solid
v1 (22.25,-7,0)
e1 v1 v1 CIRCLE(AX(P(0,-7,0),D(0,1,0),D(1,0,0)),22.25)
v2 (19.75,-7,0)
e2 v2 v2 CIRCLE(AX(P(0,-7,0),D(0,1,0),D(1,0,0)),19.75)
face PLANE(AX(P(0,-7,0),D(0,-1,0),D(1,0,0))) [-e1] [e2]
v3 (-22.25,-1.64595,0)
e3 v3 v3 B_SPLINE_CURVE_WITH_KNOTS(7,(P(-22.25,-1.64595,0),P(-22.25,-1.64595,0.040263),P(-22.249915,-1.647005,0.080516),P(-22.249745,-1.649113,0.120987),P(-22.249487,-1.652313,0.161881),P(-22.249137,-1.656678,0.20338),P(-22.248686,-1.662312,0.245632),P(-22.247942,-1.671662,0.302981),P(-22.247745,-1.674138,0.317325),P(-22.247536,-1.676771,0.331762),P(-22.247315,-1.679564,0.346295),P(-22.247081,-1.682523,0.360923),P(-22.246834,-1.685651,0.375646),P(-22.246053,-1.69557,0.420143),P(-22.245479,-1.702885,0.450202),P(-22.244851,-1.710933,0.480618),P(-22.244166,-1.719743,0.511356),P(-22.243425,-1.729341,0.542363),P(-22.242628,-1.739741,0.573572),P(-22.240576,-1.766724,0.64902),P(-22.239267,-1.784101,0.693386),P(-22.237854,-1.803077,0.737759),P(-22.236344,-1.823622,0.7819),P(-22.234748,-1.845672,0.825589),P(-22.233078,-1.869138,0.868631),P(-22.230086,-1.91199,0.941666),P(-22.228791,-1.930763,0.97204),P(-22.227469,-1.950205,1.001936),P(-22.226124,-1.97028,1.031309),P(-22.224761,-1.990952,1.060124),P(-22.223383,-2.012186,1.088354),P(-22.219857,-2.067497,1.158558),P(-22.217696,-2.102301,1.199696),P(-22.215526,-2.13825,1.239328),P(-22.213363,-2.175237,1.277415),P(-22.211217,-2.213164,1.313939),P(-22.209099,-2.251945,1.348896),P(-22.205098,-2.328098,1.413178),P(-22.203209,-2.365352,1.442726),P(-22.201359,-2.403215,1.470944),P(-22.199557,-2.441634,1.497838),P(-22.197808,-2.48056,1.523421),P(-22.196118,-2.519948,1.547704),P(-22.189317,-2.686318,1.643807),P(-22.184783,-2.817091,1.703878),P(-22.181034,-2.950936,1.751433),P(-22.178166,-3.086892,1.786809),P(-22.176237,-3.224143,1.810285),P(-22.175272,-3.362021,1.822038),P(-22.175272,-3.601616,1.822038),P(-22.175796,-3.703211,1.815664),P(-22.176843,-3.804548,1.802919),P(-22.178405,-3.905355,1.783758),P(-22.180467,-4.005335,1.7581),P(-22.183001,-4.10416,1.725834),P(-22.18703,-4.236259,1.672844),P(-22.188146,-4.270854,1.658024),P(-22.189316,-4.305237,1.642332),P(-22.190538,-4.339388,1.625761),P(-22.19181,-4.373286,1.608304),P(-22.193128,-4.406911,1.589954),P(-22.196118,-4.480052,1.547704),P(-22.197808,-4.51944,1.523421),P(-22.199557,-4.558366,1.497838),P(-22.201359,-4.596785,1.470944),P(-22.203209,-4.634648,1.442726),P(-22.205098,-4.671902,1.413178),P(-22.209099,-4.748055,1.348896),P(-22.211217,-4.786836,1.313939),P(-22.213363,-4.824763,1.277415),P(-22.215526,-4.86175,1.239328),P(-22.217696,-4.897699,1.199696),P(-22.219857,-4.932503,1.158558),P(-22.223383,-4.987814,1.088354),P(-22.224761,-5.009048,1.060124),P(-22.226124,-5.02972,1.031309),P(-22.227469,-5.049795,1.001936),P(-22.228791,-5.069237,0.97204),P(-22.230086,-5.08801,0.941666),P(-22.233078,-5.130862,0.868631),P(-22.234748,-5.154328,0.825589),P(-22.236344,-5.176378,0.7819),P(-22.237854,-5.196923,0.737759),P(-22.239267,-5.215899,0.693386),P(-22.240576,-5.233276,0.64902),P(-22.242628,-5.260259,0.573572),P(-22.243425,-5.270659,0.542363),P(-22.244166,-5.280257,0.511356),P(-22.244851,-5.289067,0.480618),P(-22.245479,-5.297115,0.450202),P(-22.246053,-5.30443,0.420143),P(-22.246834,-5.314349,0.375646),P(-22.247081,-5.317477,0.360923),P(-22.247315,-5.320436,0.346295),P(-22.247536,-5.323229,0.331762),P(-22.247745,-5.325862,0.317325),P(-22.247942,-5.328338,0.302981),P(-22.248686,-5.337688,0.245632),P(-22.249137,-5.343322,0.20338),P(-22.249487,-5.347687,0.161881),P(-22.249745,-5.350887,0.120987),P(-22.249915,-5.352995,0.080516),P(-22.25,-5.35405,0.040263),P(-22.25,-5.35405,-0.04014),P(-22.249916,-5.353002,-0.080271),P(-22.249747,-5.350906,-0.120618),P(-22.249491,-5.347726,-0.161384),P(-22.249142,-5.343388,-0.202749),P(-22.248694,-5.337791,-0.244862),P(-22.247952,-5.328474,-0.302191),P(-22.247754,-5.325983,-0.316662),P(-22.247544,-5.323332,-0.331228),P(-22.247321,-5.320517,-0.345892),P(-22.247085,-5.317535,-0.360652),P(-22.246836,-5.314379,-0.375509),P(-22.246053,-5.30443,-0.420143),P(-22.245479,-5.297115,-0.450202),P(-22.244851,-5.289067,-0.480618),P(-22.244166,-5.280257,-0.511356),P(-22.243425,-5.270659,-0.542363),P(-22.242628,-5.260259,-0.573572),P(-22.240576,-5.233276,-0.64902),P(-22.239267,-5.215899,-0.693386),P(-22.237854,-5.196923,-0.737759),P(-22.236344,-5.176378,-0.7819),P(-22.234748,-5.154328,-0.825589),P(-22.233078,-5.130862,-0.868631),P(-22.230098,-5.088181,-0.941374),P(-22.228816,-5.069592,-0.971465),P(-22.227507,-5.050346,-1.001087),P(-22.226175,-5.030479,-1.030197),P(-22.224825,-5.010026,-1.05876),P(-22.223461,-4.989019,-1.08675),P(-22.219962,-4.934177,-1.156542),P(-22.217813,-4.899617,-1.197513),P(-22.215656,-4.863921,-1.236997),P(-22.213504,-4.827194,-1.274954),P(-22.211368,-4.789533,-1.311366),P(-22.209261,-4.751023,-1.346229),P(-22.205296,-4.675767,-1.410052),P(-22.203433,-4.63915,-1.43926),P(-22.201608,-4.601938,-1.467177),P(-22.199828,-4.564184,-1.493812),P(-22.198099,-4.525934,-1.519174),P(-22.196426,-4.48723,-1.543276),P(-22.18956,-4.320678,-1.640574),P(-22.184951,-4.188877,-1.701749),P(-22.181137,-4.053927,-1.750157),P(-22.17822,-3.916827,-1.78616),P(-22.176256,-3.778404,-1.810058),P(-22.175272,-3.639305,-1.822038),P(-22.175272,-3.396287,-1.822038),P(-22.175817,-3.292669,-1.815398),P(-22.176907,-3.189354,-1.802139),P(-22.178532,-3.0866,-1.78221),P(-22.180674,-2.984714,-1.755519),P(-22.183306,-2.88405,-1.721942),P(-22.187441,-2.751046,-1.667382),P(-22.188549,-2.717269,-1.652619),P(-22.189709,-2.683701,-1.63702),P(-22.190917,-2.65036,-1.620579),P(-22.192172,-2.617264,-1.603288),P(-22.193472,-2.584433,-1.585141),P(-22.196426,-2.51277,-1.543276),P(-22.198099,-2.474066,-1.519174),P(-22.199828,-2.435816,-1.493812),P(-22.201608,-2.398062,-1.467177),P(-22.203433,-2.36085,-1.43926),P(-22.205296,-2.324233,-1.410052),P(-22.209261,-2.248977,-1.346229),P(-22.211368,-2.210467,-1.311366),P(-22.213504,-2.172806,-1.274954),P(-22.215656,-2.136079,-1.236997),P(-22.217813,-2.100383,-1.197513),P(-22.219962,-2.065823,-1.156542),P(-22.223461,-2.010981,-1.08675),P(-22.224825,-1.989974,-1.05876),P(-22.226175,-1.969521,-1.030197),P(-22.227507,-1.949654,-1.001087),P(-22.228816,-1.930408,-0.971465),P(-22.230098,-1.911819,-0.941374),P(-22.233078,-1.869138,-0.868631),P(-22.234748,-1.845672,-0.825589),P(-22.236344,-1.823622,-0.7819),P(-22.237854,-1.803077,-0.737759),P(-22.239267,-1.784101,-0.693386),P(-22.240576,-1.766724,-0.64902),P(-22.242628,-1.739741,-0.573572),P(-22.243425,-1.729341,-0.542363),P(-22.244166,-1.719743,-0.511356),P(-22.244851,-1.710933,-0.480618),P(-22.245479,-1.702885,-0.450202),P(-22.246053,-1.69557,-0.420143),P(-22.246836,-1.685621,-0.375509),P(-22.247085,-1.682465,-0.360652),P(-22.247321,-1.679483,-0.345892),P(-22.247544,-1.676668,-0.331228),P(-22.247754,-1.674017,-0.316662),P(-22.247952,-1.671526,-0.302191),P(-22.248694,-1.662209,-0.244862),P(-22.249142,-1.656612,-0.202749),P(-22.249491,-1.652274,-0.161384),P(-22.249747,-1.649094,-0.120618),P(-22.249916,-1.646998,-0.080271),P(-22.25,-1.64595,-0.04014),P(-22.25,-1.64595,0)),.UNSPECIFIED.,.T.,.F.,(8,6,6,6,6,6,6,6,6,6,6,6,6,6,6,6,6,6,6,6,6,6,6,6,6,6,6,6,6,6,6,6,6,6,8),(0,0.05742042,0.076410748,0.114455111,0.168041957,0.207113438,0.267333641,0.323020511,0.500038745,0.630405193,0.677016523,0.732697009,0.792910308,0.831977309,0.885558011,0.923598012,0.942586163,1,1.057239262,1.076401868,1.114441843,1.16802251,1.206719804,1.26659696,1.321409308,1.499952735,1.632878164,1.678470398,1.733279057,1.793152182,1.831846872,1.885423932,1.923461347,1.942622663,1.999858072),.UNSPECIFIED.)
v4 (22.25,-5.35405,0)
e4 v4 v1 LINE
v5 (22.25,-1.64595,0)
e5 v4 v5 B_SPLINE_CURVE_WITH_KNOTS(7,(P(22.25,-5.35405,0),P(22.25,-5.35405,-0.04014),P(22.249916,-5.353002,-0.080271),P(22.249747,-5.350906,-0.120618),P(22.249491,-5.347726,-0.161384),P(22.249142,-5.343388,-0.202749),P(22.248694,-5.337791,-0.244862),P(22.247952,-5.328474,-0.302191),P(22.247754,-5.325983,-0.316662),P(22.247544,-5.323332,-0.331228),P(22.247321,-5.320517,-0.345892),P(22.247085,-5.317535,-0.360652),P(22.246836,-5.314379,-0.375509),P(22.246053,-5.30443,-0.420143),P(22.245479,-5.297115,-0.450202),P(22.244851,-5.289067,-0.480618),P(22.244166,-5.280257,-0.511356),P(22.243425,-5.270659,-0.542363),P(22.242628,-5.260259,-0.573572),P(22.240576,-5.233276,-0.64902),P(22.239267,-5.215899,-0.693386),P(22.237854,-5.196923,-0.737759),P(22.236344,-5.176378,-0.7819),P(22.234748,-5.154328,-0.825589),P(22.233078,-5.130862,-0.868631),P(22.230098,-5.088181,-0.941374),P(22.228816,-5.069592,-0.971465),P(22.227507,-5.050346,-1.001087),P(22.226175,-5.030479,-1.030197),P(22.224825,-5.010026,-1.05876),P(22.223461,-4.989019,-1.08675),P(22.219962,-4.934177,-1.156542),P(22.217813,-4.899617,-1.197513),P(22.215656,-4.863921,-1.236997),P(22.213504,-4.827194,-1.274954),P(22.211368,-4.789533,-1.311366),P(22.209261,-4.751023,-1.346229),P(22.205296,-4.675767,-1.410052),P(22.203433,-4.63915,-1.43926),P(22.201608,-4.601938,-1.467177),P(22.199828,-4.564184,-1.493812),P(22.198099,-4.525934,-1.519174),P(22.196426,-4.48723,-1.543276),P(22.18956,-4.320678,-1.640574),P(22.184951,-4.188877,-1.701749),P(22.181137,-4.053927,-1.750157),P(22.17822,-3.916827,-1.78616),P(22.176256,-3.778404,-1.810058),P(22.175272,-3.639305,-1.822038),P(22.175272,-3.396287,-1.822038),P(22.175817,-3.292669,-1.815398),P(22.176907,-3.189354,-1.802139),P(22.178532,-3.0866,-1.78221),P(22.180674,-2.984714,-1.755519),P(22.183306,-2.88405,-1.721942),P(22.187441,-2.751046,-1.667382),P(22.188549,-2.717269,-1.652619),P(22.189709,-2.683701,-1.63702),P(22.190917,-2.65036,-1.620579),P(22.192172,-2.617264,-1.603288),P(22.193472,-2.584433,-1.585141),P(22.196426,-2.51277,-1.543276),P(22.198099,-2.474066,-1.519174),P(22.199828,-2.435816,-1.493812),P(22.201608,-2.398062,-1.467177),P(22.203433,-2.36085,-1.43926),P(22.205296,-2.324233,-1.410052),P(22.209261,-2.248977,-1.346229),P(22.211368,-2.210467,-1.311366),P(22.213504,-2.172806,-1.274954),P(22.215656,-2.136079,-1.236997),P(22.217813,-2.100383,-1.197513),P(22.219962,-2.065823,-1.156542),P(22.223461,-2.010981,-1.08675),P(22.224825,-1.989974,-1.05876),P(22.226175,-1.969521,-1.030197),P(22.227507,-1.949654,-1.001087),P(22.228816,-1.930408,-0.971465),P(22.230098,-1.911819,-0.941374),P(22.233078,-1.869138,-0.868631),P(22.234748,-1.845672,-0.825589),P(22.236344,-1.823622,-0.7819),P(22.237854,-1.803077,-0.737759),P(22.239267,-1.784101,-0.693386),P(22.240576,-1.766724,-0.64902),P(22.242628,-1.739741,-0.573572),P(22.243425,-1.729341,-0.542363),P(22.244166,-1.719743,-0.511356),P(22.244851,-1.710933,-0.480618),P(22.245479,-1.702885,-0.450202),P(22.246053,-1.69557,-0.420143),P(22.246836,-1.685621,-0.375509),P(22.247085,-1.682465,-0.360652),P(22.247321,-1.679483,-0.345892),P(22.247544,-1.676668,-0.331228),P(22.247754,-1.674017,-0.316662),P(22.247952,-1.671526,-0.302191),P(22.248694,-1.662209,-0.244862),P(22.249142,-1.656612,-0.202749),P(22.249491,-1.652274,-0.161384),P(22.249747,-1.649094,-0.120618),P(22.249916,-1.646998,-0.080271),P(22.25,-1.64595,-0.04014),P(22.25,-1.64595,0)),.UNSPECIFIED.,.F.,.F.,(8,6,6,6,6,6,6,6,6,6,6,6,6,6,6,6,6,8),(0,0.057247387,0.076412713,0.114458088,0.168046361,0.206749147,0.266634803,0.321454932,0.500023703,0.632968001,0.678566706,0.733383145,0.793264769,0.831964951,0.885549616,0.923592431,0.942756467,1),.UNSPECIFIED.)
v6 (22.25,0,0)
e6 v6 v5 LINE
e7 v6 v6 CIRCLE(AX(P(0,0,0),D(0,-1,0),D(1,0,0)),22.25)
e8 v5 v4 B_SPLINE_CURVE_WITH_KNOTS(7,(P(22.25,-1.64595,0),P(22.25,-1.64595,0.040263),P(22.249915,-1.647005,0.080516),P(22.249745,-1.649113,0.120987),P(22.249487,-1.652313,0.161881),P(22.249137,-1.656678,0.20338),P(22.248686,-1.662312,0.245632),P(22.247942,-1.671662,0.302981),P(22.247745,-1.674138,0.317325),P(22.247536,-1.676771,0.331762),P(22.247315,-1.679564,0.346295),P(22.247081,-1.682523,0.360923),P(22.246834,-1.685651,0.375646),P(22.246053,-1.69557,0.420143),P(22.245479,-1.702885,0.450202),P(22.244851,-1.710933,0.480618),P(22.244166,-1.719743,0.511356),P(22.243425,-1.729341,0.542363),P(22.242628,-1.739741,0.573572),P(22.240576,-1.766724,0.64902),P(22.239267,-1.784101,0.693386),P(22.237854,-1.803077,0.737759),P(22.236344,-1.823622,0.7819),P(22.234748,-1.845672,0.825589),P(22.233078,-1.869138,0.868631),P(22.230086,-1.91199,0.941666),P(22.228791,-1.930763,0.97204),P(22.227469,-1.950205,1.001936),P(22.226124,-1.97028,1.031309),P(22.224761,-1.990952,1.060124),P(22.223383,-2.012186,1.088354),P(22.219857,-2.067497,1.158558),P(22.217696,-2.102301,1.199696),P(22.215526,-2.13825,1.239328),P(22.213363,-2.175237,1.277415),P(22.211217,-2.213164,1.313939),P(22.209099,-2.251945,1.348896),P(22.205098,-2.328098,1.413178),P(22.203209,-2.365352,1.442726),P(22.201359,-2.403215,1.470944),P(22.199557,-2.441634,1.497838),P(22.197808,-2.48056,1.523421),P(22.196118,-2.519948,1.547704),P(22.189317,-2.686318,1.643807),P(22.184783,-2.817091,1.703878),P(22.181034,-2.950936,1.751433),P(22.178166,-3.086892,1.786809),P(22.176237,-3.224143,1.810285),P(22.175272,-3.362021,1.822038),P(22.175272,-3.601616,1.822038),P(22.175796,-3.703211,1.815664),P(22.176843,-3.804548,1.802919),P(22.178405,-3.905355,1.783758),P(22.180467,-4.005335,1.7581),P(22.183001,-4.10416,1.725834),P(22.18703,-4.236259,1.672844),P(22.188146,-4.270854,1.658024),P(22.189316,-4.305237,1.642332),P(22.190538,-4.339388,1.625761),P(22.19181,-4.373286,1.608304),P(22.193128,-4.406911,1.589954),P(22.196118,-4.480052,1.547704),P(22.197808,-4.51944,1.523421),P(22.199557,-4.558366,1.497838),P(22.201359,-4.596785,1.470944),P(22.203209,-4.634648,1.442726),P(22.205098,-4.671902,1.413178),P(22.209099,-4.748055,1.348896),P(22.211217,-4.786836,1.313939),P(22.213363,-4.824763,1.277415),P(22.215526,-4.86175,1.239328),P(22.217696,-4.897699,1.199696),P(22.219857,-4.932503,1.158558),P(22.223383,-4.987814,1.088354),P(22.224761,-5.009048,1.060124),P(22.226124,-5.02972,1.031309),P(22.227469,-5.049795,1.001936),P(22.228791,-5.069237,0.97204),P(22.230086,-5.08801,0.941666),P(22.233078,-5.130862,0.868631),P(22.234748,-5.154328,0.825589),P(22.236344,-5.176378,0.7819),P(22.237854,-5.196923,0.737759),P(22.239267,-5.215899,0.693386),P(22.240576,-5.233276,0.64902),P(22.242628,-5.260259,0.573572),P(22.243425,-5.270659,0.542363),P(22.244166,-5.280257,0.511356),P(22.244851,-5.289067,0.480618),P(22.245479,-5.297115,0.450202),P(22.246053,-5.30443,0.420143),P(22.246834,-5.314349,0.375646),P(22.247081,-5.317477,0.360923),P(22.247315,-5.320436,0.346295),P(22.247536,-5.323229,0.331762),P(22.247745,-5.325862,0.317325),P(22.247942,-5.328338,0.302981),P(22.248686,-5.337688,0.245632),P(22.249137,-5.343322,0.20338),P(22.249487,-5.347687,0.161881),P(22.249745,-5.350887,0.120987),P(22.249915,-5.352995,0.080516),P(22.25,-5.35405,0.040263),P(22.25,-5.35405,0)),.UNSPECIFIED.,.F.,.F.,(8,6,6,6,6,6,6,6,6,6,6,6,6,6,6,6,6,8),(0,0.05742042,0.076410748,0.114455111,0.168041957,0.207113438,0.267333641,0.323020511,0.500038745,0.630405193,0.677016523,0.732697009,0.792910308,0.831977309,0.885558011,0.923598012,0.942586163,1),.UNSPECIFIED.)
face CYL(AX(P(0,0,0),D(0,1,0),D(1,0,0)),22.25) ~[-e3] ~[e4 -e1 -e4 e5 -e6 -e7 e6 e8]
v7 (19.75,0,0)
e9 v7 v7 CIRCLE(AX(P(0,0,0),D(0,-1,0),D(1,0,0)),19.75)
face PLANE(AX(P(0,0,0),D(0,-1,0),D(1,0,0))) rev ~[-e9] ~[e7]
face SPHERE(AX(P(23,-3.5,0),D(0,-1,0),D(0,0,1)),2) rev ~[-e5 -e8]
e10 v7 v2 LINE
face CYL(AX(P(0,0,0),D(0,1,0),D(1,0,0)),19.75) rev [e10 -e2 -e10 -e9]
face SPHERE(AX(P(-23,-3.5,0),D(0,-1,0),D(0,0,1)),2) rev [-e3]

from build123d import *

# Parameters (mm, degrees)
F0_R     = 22.25
F0_R_2   = 19.75
F1_DEPTH = 7


# Not quite as in the source:
# - a feature of the source that left no trace in its solid (it failed there, or was rolled back) is left out
# - the program builds the solid bodies; features that only make, move or delete a surface that nothing else refers to are left out


with BuildPart() as f1:
    # F0 (on Front) → F1 (new body)
    with BuildSketch(Plane.XZ):
        Circle(F0_R)
        Circle(F0_R_2, mode=Mode.SUBTRACT)
    extrude(amount=F1_DEPTH)

    # F7 (on offset) → F8 (revolve, cut)
    with BuildSketch(Plane.YZ.offset(23)):
        with BuildLine():
            Line((-5.5, 0), (-1.5, 0))
            ThreePointArc((-1.5, 0), (-3.5, 2), (-5.5, 0))
        make_face()
    revolve(axis=Axis((23, -3.487871727, 0), (0, -1, 0)), mode=Mode.SUBTRACT)

    # F9: F1 across plane


with BuildPart() as f1_1:
    add(f1.part)
    add(f1.part.mirror(Plane.YZ), mode=Mode.INTERSECT)


solid = f1_1.part
